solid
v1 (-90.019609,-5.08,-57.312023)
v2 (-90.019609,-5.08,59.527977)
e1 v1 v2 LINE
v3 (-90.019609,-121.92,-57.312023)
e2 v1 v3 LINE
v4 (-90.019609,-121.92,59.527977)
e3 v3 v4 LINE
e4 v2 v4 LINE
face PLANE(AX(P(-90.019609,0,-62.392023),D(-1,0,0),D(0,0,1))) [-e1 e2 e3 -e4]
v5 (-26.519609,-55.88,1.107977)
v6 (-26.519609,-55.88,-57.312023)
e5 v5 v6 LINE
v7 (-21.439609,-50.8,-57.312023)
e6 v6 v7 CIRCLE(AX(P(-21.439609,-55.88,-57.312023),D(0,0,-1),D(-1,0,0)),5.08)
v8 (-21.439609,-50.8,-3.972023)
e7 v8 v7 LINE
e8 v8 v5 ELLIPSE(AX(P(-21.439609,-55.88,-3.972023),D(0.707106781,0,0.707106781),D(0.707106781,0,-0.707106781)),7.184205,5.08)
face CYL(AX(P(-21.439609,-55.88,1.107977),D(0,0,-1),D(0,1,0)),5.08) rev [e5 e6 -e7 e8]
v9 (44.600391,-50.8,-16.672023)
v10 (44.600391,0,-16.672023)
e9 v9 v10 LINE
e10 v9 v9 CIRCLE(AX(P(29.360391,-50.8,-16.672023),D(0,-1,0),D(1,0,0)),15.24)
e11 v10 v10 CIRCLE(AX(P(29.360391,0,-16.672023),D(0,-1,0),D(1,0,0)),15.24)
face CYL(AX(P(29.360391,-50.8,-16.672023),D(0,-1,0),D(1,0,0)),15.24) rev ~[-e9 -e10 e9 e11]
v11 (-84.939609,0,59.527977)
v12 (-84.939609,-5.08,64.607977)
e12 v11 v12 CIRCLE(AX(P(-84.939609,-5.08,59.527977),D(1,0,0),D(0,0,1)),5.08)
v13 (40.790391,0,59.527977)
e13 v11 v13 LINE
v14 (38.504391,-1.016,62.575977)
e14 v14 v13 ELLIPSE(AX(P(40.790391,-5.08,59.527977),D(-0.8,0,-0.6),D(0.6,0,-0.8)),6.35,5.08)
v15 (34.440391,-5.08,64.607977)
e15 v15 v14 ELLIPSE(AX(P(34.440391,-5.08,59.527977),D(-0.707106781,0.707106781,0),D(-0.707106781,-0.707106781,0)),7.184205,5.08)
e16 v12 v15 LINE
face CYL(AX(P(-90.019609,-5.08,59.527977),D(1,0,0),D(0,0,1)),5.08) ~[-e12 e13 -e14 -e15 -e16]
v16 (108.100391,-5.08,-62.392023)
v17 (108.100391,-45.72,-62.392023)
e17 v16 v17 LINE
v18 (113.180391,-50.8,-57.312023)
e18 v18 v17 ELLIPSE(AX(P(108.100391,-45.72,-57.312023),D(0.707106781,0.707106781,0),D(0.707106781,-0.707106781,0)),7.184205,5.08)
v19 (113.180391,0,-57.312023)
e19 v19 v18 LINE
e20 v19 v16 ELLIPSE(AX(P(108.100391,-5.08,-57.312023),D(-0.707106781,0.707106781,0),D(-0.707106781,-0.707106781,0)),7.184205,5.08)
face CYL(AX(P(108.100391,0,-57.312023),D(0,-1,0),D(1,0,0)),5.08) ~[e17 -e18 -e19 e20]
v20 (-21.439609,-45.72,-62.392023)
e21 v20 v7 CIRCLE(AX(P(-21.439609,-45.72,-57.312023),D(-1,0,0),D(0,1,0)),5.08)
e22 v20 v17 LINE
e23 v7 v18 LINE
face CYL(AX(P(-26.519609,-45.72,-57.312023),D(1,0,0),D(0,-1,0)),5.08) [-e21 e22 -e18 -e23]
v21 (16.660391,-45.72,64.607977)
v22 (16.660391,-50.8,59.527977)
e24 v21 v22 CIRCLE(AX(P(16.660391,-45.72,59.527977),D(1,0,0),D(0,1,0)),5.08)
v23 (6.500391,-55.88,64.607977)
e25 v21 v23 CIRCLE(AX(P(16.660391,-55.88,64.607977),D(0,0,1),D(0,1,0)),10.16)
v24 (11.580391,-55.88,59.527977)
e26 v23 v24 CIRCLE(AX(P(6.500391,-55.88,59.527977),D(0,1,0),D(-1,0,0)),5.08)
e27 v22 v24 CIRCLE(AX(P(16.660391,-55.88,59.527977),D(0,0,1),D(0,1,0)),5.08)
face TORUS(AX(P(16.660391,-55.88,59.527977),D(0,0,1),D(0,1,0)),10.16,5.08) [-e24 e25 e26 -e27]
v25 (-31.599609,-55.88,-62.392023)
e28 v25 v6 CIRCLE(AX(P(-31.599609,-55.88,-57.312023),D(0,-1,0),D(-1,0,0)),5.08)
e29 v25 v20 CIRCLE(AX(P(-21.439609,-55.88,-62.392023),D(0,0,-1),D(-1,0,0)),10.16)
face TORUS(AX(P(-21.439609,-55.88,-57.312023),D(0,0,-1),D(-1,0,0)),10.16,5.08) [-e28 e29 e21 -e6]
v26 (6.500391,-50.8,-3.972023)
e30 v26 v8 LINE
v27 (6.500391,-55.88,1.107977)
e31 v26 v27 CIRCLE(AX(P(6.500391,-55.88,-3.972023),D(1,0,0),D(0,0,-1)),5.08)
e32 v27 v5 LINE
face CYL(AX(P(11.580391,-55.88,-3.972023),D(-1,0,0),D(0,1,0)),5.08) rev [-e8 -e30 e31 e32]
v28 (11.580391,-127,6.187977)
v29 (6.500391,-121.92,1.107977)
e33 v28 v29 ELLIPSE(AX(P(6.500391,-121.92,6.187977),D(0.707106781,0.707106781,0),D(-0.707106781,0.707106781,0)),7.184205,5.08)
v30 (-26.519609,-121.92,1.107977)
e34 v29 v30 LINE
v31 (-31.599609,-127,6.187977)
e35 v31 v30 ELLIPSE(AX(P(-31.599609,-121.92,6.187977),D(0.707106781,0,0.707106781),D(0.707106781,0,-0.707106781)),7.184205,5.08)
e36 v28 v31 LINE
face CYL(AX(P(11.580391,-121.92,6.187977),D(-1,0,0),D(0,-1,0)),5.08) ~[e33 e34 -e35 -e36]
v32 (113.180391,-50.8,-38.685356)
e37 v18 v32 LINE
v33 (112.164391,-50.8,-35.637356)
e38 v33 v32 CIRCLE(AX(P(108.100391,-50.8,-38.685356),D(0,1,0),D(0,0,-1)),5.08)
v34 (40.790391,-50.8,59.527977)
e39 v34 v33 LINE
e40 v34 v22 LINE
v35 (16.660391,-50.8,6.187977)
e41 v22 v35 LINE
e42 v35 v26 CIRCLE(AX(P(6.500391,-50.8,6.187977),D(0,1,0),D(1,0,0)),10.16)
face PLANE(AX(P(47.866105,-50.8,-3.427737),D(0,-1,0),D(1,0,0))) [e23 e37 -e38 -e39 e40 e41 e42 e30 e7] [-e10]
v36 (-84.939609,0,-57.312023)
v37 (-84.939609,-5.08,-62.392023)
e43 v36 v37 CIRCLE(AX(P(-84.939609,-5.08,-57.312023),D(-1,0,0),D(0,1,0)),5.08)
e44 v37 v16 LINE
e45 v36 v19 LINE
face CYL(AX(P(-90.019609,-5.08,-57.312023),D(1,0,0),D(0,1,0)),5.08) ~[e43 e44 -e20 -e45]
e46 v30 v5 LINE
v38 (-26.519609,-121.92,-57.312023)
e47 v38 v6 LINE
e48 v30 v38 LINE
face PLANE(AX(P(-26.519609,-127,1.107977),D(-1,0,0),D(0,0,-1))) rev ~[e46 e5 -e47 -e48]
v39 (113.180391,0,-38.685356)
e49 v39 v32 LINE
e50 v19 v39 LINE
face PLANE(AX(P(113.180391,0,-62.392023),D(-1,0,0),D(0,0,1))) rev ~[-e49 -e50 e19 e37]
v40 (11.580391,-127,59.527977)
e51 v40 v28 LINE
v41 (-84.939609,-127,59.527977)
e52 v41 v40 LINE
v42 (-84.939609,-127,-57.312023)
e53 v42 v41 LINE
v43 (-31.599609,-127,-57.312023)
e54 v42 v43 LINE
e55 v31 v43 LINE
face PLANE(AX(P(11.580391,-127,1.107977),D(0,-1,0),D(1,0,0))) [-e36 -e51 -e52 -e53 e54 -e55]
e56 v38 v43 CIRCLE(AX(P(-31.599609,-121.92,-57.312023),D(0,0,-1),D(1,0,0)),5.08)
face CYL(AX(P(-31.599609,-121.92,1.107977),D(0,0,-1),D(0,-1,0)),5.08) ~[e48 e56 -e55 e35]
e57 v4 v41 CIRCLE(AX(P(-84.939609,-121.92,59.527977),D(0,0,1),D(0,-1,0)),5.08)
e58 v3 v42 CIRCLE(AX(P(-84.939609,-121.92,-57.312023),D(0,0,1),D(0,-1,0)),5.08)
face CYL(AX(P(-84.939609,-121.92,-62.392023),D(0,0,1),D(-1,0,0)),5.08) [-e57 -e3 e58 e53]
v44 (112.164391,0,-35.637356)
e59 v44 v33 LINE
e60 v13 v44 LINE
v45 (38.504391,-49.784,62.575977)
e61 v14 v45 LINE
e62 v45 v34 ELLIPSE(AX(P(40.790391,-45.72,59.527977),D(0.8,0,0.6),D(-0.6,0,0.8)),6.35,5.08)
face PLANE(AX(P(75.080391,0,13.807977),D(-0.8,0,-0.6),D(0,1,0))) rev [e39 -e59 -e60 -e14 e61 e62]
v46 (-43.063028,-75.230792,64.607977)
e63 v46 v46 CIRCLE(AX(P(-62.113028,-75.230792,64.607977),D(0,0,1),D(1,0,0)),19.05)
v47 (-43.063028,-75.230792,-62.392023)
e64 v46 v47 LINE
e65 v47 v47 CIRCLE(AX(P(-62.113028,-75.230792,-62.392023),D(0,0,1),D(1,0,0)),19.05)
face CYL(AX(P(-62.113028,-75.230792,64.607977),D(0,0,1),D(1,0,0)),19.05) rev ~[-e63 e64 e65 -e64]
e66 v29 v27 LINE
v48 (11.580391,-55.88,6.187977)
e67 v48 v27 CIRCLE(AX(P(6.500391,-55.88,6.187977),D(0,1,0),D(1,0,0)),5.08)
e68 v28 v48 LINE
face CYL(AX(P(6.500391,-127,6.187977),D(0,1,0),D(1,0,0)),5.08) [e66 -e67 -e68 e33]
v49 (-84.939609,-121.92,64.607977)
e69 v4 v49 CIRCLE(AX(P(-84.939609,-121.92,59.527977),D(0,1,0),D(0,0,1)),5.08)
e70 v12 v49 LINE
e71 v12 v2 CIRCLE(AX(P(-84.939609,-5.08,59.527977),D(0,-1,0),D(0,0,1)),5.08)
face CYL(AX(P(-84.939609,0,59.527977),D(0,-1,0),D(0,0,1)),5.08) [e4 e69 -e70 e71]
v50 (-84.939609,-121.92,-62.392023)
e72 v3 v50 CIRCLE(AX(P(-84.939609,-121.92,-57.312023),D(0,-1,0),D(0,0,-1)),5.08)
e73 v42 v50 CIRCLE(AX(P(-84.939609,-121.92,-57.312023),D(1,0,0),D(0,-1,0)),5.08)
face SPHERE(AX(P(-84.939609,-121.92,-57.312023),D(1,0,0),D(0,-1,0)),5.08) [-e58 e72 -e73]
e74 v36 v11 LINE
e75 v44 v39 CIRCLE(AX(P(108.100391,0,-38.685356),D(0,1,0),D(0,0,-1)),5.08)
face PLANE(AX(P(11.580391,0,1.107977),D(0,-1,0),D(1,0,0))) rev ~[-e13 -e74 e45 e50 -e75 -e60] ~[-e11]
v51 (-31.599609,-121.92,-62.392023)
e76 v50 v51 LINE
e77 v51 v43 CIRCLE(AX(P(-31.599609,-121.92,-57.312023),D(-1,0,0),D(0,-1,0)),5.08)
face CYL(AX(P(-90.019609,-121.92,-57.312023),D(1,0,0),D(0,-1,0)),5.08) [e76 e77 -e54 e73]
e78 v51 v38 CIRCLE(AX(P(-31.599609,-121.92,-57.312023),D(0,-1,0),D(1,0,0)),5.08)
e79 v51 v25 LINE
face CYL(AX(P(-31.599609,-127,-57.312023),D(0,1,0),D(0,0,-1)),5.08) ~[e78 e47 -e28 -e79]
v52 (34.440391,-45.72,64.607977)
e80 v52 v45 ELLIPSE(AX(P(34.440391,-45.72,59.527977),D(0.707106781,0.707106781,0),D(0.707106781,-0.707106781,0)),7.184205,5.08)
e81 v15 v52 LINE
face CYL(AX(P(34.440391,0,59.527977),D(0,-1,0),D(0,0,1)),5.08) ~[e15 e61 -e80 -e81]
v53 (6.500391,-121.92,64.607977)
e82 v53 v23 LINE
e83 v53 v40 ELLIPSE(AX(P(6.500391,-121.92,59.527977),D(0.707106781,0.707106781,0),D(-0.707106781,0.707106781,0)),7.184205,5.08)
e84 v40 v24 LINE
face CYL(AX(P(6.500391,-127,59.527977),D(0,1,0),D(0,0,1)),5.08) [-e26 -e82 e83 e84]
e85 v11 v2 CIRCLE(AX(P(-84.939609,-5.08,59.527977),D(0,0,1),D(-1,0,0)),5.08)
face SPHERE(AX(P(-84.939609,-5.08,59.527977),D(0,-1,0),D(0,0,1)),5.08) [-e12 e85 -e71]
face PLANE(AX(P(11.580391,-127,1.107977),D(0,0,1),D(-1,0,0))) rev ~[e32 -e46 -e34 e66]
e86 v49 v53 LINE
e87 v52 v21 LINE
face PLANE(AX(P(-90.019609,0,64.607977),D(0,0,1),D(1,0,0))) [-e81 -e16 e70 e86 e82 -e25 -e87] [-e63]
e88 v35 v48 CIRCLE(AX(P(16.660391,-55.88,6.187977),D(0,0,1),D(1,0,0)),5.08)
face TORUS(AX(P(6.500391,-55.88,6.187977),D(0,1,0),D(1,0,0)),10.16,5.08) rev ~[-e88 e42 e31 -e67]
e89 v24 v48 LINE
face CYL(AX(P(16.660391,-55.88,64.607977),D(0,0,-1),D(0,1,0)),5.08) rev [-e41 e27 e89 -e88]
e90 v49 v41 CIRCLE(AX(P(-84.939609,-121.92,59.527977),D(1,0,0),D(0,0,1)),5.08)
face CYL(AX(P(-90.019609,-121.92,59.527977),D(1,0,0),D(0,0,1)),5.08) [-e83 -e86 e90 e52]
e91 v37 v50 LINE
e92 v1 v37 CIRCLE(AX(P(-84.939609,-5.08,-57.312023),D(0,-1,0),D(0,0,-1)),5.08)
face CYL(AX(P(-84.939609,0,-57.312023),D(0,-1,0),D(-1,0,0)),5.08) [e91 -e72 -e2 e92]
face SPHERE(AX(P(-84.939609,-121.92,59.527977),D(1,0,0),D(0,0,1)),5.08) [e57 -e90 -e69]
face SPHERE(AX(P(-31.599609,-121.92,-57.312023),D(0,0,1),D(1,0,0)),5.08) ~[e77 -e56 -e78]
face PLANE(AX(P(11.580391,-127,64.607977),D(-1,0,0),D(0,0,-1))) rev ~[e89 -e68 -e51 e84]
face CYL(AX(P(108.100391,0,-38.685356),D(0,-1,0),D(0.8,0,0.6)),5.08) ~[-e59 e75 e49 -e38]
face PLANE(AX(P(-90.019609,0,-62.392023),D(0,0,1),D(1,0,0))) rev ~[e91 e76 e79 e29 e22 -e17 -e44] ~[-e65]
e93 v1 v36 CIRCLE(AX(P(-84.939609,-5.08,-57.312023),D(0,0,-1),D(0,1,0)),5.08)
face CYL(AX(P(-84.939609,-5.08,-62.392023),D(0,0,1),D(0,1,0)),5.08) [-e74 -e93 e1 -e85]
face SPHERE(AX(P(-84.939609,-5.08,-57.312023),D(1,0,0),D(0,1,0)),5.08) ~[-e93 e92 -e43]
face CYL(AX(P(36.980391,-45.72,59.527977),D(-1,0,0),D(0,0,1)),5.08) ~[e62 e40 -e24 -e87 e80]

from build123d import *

# Parameters (mm, degrees)
F0_W     = 203.2
F0_H     = 127
F1_DEPTH = 127
F3_DEPTH = 76.2
F4_SIZE2 = 101.6
F4_SIZE  = 76.2
F5_R     = 5.08
F6_R     = 15.24
F7_DEPTH = 50.8
F8_R     = 19.05
F9_DEPTH = 127


with BuildPart() as f1:
    # F0 (on Front) → F1 (new body)
    with BuildSketch(Plane.XZ):
        with Locations((11.5803908557, 1.1079770926)):
            Rectangle(F0_W, F0_H)
    extrude(amount=F1_DEPTH)

    # F2 (on face) → F3 (cut)
    with BuildSketch(Plane.XZ.offset(127)):
        Polygon((-26.5196091443, 1.1079770926), (-26.5196091443, -62.3920229074), (113.1803908557, -62.3920229074), (113.1803908557, 64.6079770926), (11.5803908557, 64.6079770926), (11.5803908557, 1.1079770926), align=None)
    extrude(amount=-F3_DEPTH, mode=Mode.SUBTRACT)

    # F4
    f4_edges = [f1.edges().sort_by_distance(p)[0] for p in [
        (113.180391, -25.4, 64.607977),
    ]]
    f4_side = f1.faces().sort_by_distance((-10.191038, -52.614286, 64.607977))[0]
    chamfer(f4_edges, length=F4_SIZE, length2=F4_SIZE2, reference=f4_side)

    # F5
    f5_edges = [f1.edges().sort_by_distance(p)[0] for p in [
        (11.580391, -88.9, 64.607977),
        (11.580391, -88.9, 1.107977),
        (11.580391, -50.8, 32.857977),
        (-26.519609, -50.8, -30.642023),
        (-26.519609, -127, -30.642023),
        (-26.519609, -88.9, -62.392023),
        (-7.469609, -127, 1.107977),
        (-39.219609, -127, 64.607977),
        (-90.019609, -63.5, 64.607977),
        (-26.519609, 0, 64.607977),
        (-58.269609, -127, -62.392023),
        (-90.019609, -127, 1.107977),
        (43.330391, -50.8, -62.392023),
        (113.180391, -25.4, -62.392023),
        (36.980391, -25.4, 64.607977),
        (113.180391, -25.4, -36.992023),
        (11.580391, 0, -62.392023),
        (-90.019609, 0, 1.107977),
        (-90.019609, -63.5, -62.392023),
        (24.280391, -50.8, 64.607977),
        (-7.469609, -50.8, 1.107977),
    ]]
    fillet(f5_edges, radius=F5_R)

    # F6 (on face) → F7 (cut, through all)
    with BuildSketch(Plane.XZ.offset(50.8)):
        with Locations((29.3603908557, -16.6720229074)):
            Circle(F6_R)
    extrude(amount=-F7_DEPTH, mode=Mode.SUBTRACT)

    # F8 (on face) → F9 (cut)
    with BuildSketch(Plane.XY.offset(64.6079770926)):
        with Locations((-62.1130280197, -75.2307921648)):
            Circle(F8_R)
    extrude(amount=-F9_DEPTH, mode=Mode.SUBTRACT)


solid = f1.part
